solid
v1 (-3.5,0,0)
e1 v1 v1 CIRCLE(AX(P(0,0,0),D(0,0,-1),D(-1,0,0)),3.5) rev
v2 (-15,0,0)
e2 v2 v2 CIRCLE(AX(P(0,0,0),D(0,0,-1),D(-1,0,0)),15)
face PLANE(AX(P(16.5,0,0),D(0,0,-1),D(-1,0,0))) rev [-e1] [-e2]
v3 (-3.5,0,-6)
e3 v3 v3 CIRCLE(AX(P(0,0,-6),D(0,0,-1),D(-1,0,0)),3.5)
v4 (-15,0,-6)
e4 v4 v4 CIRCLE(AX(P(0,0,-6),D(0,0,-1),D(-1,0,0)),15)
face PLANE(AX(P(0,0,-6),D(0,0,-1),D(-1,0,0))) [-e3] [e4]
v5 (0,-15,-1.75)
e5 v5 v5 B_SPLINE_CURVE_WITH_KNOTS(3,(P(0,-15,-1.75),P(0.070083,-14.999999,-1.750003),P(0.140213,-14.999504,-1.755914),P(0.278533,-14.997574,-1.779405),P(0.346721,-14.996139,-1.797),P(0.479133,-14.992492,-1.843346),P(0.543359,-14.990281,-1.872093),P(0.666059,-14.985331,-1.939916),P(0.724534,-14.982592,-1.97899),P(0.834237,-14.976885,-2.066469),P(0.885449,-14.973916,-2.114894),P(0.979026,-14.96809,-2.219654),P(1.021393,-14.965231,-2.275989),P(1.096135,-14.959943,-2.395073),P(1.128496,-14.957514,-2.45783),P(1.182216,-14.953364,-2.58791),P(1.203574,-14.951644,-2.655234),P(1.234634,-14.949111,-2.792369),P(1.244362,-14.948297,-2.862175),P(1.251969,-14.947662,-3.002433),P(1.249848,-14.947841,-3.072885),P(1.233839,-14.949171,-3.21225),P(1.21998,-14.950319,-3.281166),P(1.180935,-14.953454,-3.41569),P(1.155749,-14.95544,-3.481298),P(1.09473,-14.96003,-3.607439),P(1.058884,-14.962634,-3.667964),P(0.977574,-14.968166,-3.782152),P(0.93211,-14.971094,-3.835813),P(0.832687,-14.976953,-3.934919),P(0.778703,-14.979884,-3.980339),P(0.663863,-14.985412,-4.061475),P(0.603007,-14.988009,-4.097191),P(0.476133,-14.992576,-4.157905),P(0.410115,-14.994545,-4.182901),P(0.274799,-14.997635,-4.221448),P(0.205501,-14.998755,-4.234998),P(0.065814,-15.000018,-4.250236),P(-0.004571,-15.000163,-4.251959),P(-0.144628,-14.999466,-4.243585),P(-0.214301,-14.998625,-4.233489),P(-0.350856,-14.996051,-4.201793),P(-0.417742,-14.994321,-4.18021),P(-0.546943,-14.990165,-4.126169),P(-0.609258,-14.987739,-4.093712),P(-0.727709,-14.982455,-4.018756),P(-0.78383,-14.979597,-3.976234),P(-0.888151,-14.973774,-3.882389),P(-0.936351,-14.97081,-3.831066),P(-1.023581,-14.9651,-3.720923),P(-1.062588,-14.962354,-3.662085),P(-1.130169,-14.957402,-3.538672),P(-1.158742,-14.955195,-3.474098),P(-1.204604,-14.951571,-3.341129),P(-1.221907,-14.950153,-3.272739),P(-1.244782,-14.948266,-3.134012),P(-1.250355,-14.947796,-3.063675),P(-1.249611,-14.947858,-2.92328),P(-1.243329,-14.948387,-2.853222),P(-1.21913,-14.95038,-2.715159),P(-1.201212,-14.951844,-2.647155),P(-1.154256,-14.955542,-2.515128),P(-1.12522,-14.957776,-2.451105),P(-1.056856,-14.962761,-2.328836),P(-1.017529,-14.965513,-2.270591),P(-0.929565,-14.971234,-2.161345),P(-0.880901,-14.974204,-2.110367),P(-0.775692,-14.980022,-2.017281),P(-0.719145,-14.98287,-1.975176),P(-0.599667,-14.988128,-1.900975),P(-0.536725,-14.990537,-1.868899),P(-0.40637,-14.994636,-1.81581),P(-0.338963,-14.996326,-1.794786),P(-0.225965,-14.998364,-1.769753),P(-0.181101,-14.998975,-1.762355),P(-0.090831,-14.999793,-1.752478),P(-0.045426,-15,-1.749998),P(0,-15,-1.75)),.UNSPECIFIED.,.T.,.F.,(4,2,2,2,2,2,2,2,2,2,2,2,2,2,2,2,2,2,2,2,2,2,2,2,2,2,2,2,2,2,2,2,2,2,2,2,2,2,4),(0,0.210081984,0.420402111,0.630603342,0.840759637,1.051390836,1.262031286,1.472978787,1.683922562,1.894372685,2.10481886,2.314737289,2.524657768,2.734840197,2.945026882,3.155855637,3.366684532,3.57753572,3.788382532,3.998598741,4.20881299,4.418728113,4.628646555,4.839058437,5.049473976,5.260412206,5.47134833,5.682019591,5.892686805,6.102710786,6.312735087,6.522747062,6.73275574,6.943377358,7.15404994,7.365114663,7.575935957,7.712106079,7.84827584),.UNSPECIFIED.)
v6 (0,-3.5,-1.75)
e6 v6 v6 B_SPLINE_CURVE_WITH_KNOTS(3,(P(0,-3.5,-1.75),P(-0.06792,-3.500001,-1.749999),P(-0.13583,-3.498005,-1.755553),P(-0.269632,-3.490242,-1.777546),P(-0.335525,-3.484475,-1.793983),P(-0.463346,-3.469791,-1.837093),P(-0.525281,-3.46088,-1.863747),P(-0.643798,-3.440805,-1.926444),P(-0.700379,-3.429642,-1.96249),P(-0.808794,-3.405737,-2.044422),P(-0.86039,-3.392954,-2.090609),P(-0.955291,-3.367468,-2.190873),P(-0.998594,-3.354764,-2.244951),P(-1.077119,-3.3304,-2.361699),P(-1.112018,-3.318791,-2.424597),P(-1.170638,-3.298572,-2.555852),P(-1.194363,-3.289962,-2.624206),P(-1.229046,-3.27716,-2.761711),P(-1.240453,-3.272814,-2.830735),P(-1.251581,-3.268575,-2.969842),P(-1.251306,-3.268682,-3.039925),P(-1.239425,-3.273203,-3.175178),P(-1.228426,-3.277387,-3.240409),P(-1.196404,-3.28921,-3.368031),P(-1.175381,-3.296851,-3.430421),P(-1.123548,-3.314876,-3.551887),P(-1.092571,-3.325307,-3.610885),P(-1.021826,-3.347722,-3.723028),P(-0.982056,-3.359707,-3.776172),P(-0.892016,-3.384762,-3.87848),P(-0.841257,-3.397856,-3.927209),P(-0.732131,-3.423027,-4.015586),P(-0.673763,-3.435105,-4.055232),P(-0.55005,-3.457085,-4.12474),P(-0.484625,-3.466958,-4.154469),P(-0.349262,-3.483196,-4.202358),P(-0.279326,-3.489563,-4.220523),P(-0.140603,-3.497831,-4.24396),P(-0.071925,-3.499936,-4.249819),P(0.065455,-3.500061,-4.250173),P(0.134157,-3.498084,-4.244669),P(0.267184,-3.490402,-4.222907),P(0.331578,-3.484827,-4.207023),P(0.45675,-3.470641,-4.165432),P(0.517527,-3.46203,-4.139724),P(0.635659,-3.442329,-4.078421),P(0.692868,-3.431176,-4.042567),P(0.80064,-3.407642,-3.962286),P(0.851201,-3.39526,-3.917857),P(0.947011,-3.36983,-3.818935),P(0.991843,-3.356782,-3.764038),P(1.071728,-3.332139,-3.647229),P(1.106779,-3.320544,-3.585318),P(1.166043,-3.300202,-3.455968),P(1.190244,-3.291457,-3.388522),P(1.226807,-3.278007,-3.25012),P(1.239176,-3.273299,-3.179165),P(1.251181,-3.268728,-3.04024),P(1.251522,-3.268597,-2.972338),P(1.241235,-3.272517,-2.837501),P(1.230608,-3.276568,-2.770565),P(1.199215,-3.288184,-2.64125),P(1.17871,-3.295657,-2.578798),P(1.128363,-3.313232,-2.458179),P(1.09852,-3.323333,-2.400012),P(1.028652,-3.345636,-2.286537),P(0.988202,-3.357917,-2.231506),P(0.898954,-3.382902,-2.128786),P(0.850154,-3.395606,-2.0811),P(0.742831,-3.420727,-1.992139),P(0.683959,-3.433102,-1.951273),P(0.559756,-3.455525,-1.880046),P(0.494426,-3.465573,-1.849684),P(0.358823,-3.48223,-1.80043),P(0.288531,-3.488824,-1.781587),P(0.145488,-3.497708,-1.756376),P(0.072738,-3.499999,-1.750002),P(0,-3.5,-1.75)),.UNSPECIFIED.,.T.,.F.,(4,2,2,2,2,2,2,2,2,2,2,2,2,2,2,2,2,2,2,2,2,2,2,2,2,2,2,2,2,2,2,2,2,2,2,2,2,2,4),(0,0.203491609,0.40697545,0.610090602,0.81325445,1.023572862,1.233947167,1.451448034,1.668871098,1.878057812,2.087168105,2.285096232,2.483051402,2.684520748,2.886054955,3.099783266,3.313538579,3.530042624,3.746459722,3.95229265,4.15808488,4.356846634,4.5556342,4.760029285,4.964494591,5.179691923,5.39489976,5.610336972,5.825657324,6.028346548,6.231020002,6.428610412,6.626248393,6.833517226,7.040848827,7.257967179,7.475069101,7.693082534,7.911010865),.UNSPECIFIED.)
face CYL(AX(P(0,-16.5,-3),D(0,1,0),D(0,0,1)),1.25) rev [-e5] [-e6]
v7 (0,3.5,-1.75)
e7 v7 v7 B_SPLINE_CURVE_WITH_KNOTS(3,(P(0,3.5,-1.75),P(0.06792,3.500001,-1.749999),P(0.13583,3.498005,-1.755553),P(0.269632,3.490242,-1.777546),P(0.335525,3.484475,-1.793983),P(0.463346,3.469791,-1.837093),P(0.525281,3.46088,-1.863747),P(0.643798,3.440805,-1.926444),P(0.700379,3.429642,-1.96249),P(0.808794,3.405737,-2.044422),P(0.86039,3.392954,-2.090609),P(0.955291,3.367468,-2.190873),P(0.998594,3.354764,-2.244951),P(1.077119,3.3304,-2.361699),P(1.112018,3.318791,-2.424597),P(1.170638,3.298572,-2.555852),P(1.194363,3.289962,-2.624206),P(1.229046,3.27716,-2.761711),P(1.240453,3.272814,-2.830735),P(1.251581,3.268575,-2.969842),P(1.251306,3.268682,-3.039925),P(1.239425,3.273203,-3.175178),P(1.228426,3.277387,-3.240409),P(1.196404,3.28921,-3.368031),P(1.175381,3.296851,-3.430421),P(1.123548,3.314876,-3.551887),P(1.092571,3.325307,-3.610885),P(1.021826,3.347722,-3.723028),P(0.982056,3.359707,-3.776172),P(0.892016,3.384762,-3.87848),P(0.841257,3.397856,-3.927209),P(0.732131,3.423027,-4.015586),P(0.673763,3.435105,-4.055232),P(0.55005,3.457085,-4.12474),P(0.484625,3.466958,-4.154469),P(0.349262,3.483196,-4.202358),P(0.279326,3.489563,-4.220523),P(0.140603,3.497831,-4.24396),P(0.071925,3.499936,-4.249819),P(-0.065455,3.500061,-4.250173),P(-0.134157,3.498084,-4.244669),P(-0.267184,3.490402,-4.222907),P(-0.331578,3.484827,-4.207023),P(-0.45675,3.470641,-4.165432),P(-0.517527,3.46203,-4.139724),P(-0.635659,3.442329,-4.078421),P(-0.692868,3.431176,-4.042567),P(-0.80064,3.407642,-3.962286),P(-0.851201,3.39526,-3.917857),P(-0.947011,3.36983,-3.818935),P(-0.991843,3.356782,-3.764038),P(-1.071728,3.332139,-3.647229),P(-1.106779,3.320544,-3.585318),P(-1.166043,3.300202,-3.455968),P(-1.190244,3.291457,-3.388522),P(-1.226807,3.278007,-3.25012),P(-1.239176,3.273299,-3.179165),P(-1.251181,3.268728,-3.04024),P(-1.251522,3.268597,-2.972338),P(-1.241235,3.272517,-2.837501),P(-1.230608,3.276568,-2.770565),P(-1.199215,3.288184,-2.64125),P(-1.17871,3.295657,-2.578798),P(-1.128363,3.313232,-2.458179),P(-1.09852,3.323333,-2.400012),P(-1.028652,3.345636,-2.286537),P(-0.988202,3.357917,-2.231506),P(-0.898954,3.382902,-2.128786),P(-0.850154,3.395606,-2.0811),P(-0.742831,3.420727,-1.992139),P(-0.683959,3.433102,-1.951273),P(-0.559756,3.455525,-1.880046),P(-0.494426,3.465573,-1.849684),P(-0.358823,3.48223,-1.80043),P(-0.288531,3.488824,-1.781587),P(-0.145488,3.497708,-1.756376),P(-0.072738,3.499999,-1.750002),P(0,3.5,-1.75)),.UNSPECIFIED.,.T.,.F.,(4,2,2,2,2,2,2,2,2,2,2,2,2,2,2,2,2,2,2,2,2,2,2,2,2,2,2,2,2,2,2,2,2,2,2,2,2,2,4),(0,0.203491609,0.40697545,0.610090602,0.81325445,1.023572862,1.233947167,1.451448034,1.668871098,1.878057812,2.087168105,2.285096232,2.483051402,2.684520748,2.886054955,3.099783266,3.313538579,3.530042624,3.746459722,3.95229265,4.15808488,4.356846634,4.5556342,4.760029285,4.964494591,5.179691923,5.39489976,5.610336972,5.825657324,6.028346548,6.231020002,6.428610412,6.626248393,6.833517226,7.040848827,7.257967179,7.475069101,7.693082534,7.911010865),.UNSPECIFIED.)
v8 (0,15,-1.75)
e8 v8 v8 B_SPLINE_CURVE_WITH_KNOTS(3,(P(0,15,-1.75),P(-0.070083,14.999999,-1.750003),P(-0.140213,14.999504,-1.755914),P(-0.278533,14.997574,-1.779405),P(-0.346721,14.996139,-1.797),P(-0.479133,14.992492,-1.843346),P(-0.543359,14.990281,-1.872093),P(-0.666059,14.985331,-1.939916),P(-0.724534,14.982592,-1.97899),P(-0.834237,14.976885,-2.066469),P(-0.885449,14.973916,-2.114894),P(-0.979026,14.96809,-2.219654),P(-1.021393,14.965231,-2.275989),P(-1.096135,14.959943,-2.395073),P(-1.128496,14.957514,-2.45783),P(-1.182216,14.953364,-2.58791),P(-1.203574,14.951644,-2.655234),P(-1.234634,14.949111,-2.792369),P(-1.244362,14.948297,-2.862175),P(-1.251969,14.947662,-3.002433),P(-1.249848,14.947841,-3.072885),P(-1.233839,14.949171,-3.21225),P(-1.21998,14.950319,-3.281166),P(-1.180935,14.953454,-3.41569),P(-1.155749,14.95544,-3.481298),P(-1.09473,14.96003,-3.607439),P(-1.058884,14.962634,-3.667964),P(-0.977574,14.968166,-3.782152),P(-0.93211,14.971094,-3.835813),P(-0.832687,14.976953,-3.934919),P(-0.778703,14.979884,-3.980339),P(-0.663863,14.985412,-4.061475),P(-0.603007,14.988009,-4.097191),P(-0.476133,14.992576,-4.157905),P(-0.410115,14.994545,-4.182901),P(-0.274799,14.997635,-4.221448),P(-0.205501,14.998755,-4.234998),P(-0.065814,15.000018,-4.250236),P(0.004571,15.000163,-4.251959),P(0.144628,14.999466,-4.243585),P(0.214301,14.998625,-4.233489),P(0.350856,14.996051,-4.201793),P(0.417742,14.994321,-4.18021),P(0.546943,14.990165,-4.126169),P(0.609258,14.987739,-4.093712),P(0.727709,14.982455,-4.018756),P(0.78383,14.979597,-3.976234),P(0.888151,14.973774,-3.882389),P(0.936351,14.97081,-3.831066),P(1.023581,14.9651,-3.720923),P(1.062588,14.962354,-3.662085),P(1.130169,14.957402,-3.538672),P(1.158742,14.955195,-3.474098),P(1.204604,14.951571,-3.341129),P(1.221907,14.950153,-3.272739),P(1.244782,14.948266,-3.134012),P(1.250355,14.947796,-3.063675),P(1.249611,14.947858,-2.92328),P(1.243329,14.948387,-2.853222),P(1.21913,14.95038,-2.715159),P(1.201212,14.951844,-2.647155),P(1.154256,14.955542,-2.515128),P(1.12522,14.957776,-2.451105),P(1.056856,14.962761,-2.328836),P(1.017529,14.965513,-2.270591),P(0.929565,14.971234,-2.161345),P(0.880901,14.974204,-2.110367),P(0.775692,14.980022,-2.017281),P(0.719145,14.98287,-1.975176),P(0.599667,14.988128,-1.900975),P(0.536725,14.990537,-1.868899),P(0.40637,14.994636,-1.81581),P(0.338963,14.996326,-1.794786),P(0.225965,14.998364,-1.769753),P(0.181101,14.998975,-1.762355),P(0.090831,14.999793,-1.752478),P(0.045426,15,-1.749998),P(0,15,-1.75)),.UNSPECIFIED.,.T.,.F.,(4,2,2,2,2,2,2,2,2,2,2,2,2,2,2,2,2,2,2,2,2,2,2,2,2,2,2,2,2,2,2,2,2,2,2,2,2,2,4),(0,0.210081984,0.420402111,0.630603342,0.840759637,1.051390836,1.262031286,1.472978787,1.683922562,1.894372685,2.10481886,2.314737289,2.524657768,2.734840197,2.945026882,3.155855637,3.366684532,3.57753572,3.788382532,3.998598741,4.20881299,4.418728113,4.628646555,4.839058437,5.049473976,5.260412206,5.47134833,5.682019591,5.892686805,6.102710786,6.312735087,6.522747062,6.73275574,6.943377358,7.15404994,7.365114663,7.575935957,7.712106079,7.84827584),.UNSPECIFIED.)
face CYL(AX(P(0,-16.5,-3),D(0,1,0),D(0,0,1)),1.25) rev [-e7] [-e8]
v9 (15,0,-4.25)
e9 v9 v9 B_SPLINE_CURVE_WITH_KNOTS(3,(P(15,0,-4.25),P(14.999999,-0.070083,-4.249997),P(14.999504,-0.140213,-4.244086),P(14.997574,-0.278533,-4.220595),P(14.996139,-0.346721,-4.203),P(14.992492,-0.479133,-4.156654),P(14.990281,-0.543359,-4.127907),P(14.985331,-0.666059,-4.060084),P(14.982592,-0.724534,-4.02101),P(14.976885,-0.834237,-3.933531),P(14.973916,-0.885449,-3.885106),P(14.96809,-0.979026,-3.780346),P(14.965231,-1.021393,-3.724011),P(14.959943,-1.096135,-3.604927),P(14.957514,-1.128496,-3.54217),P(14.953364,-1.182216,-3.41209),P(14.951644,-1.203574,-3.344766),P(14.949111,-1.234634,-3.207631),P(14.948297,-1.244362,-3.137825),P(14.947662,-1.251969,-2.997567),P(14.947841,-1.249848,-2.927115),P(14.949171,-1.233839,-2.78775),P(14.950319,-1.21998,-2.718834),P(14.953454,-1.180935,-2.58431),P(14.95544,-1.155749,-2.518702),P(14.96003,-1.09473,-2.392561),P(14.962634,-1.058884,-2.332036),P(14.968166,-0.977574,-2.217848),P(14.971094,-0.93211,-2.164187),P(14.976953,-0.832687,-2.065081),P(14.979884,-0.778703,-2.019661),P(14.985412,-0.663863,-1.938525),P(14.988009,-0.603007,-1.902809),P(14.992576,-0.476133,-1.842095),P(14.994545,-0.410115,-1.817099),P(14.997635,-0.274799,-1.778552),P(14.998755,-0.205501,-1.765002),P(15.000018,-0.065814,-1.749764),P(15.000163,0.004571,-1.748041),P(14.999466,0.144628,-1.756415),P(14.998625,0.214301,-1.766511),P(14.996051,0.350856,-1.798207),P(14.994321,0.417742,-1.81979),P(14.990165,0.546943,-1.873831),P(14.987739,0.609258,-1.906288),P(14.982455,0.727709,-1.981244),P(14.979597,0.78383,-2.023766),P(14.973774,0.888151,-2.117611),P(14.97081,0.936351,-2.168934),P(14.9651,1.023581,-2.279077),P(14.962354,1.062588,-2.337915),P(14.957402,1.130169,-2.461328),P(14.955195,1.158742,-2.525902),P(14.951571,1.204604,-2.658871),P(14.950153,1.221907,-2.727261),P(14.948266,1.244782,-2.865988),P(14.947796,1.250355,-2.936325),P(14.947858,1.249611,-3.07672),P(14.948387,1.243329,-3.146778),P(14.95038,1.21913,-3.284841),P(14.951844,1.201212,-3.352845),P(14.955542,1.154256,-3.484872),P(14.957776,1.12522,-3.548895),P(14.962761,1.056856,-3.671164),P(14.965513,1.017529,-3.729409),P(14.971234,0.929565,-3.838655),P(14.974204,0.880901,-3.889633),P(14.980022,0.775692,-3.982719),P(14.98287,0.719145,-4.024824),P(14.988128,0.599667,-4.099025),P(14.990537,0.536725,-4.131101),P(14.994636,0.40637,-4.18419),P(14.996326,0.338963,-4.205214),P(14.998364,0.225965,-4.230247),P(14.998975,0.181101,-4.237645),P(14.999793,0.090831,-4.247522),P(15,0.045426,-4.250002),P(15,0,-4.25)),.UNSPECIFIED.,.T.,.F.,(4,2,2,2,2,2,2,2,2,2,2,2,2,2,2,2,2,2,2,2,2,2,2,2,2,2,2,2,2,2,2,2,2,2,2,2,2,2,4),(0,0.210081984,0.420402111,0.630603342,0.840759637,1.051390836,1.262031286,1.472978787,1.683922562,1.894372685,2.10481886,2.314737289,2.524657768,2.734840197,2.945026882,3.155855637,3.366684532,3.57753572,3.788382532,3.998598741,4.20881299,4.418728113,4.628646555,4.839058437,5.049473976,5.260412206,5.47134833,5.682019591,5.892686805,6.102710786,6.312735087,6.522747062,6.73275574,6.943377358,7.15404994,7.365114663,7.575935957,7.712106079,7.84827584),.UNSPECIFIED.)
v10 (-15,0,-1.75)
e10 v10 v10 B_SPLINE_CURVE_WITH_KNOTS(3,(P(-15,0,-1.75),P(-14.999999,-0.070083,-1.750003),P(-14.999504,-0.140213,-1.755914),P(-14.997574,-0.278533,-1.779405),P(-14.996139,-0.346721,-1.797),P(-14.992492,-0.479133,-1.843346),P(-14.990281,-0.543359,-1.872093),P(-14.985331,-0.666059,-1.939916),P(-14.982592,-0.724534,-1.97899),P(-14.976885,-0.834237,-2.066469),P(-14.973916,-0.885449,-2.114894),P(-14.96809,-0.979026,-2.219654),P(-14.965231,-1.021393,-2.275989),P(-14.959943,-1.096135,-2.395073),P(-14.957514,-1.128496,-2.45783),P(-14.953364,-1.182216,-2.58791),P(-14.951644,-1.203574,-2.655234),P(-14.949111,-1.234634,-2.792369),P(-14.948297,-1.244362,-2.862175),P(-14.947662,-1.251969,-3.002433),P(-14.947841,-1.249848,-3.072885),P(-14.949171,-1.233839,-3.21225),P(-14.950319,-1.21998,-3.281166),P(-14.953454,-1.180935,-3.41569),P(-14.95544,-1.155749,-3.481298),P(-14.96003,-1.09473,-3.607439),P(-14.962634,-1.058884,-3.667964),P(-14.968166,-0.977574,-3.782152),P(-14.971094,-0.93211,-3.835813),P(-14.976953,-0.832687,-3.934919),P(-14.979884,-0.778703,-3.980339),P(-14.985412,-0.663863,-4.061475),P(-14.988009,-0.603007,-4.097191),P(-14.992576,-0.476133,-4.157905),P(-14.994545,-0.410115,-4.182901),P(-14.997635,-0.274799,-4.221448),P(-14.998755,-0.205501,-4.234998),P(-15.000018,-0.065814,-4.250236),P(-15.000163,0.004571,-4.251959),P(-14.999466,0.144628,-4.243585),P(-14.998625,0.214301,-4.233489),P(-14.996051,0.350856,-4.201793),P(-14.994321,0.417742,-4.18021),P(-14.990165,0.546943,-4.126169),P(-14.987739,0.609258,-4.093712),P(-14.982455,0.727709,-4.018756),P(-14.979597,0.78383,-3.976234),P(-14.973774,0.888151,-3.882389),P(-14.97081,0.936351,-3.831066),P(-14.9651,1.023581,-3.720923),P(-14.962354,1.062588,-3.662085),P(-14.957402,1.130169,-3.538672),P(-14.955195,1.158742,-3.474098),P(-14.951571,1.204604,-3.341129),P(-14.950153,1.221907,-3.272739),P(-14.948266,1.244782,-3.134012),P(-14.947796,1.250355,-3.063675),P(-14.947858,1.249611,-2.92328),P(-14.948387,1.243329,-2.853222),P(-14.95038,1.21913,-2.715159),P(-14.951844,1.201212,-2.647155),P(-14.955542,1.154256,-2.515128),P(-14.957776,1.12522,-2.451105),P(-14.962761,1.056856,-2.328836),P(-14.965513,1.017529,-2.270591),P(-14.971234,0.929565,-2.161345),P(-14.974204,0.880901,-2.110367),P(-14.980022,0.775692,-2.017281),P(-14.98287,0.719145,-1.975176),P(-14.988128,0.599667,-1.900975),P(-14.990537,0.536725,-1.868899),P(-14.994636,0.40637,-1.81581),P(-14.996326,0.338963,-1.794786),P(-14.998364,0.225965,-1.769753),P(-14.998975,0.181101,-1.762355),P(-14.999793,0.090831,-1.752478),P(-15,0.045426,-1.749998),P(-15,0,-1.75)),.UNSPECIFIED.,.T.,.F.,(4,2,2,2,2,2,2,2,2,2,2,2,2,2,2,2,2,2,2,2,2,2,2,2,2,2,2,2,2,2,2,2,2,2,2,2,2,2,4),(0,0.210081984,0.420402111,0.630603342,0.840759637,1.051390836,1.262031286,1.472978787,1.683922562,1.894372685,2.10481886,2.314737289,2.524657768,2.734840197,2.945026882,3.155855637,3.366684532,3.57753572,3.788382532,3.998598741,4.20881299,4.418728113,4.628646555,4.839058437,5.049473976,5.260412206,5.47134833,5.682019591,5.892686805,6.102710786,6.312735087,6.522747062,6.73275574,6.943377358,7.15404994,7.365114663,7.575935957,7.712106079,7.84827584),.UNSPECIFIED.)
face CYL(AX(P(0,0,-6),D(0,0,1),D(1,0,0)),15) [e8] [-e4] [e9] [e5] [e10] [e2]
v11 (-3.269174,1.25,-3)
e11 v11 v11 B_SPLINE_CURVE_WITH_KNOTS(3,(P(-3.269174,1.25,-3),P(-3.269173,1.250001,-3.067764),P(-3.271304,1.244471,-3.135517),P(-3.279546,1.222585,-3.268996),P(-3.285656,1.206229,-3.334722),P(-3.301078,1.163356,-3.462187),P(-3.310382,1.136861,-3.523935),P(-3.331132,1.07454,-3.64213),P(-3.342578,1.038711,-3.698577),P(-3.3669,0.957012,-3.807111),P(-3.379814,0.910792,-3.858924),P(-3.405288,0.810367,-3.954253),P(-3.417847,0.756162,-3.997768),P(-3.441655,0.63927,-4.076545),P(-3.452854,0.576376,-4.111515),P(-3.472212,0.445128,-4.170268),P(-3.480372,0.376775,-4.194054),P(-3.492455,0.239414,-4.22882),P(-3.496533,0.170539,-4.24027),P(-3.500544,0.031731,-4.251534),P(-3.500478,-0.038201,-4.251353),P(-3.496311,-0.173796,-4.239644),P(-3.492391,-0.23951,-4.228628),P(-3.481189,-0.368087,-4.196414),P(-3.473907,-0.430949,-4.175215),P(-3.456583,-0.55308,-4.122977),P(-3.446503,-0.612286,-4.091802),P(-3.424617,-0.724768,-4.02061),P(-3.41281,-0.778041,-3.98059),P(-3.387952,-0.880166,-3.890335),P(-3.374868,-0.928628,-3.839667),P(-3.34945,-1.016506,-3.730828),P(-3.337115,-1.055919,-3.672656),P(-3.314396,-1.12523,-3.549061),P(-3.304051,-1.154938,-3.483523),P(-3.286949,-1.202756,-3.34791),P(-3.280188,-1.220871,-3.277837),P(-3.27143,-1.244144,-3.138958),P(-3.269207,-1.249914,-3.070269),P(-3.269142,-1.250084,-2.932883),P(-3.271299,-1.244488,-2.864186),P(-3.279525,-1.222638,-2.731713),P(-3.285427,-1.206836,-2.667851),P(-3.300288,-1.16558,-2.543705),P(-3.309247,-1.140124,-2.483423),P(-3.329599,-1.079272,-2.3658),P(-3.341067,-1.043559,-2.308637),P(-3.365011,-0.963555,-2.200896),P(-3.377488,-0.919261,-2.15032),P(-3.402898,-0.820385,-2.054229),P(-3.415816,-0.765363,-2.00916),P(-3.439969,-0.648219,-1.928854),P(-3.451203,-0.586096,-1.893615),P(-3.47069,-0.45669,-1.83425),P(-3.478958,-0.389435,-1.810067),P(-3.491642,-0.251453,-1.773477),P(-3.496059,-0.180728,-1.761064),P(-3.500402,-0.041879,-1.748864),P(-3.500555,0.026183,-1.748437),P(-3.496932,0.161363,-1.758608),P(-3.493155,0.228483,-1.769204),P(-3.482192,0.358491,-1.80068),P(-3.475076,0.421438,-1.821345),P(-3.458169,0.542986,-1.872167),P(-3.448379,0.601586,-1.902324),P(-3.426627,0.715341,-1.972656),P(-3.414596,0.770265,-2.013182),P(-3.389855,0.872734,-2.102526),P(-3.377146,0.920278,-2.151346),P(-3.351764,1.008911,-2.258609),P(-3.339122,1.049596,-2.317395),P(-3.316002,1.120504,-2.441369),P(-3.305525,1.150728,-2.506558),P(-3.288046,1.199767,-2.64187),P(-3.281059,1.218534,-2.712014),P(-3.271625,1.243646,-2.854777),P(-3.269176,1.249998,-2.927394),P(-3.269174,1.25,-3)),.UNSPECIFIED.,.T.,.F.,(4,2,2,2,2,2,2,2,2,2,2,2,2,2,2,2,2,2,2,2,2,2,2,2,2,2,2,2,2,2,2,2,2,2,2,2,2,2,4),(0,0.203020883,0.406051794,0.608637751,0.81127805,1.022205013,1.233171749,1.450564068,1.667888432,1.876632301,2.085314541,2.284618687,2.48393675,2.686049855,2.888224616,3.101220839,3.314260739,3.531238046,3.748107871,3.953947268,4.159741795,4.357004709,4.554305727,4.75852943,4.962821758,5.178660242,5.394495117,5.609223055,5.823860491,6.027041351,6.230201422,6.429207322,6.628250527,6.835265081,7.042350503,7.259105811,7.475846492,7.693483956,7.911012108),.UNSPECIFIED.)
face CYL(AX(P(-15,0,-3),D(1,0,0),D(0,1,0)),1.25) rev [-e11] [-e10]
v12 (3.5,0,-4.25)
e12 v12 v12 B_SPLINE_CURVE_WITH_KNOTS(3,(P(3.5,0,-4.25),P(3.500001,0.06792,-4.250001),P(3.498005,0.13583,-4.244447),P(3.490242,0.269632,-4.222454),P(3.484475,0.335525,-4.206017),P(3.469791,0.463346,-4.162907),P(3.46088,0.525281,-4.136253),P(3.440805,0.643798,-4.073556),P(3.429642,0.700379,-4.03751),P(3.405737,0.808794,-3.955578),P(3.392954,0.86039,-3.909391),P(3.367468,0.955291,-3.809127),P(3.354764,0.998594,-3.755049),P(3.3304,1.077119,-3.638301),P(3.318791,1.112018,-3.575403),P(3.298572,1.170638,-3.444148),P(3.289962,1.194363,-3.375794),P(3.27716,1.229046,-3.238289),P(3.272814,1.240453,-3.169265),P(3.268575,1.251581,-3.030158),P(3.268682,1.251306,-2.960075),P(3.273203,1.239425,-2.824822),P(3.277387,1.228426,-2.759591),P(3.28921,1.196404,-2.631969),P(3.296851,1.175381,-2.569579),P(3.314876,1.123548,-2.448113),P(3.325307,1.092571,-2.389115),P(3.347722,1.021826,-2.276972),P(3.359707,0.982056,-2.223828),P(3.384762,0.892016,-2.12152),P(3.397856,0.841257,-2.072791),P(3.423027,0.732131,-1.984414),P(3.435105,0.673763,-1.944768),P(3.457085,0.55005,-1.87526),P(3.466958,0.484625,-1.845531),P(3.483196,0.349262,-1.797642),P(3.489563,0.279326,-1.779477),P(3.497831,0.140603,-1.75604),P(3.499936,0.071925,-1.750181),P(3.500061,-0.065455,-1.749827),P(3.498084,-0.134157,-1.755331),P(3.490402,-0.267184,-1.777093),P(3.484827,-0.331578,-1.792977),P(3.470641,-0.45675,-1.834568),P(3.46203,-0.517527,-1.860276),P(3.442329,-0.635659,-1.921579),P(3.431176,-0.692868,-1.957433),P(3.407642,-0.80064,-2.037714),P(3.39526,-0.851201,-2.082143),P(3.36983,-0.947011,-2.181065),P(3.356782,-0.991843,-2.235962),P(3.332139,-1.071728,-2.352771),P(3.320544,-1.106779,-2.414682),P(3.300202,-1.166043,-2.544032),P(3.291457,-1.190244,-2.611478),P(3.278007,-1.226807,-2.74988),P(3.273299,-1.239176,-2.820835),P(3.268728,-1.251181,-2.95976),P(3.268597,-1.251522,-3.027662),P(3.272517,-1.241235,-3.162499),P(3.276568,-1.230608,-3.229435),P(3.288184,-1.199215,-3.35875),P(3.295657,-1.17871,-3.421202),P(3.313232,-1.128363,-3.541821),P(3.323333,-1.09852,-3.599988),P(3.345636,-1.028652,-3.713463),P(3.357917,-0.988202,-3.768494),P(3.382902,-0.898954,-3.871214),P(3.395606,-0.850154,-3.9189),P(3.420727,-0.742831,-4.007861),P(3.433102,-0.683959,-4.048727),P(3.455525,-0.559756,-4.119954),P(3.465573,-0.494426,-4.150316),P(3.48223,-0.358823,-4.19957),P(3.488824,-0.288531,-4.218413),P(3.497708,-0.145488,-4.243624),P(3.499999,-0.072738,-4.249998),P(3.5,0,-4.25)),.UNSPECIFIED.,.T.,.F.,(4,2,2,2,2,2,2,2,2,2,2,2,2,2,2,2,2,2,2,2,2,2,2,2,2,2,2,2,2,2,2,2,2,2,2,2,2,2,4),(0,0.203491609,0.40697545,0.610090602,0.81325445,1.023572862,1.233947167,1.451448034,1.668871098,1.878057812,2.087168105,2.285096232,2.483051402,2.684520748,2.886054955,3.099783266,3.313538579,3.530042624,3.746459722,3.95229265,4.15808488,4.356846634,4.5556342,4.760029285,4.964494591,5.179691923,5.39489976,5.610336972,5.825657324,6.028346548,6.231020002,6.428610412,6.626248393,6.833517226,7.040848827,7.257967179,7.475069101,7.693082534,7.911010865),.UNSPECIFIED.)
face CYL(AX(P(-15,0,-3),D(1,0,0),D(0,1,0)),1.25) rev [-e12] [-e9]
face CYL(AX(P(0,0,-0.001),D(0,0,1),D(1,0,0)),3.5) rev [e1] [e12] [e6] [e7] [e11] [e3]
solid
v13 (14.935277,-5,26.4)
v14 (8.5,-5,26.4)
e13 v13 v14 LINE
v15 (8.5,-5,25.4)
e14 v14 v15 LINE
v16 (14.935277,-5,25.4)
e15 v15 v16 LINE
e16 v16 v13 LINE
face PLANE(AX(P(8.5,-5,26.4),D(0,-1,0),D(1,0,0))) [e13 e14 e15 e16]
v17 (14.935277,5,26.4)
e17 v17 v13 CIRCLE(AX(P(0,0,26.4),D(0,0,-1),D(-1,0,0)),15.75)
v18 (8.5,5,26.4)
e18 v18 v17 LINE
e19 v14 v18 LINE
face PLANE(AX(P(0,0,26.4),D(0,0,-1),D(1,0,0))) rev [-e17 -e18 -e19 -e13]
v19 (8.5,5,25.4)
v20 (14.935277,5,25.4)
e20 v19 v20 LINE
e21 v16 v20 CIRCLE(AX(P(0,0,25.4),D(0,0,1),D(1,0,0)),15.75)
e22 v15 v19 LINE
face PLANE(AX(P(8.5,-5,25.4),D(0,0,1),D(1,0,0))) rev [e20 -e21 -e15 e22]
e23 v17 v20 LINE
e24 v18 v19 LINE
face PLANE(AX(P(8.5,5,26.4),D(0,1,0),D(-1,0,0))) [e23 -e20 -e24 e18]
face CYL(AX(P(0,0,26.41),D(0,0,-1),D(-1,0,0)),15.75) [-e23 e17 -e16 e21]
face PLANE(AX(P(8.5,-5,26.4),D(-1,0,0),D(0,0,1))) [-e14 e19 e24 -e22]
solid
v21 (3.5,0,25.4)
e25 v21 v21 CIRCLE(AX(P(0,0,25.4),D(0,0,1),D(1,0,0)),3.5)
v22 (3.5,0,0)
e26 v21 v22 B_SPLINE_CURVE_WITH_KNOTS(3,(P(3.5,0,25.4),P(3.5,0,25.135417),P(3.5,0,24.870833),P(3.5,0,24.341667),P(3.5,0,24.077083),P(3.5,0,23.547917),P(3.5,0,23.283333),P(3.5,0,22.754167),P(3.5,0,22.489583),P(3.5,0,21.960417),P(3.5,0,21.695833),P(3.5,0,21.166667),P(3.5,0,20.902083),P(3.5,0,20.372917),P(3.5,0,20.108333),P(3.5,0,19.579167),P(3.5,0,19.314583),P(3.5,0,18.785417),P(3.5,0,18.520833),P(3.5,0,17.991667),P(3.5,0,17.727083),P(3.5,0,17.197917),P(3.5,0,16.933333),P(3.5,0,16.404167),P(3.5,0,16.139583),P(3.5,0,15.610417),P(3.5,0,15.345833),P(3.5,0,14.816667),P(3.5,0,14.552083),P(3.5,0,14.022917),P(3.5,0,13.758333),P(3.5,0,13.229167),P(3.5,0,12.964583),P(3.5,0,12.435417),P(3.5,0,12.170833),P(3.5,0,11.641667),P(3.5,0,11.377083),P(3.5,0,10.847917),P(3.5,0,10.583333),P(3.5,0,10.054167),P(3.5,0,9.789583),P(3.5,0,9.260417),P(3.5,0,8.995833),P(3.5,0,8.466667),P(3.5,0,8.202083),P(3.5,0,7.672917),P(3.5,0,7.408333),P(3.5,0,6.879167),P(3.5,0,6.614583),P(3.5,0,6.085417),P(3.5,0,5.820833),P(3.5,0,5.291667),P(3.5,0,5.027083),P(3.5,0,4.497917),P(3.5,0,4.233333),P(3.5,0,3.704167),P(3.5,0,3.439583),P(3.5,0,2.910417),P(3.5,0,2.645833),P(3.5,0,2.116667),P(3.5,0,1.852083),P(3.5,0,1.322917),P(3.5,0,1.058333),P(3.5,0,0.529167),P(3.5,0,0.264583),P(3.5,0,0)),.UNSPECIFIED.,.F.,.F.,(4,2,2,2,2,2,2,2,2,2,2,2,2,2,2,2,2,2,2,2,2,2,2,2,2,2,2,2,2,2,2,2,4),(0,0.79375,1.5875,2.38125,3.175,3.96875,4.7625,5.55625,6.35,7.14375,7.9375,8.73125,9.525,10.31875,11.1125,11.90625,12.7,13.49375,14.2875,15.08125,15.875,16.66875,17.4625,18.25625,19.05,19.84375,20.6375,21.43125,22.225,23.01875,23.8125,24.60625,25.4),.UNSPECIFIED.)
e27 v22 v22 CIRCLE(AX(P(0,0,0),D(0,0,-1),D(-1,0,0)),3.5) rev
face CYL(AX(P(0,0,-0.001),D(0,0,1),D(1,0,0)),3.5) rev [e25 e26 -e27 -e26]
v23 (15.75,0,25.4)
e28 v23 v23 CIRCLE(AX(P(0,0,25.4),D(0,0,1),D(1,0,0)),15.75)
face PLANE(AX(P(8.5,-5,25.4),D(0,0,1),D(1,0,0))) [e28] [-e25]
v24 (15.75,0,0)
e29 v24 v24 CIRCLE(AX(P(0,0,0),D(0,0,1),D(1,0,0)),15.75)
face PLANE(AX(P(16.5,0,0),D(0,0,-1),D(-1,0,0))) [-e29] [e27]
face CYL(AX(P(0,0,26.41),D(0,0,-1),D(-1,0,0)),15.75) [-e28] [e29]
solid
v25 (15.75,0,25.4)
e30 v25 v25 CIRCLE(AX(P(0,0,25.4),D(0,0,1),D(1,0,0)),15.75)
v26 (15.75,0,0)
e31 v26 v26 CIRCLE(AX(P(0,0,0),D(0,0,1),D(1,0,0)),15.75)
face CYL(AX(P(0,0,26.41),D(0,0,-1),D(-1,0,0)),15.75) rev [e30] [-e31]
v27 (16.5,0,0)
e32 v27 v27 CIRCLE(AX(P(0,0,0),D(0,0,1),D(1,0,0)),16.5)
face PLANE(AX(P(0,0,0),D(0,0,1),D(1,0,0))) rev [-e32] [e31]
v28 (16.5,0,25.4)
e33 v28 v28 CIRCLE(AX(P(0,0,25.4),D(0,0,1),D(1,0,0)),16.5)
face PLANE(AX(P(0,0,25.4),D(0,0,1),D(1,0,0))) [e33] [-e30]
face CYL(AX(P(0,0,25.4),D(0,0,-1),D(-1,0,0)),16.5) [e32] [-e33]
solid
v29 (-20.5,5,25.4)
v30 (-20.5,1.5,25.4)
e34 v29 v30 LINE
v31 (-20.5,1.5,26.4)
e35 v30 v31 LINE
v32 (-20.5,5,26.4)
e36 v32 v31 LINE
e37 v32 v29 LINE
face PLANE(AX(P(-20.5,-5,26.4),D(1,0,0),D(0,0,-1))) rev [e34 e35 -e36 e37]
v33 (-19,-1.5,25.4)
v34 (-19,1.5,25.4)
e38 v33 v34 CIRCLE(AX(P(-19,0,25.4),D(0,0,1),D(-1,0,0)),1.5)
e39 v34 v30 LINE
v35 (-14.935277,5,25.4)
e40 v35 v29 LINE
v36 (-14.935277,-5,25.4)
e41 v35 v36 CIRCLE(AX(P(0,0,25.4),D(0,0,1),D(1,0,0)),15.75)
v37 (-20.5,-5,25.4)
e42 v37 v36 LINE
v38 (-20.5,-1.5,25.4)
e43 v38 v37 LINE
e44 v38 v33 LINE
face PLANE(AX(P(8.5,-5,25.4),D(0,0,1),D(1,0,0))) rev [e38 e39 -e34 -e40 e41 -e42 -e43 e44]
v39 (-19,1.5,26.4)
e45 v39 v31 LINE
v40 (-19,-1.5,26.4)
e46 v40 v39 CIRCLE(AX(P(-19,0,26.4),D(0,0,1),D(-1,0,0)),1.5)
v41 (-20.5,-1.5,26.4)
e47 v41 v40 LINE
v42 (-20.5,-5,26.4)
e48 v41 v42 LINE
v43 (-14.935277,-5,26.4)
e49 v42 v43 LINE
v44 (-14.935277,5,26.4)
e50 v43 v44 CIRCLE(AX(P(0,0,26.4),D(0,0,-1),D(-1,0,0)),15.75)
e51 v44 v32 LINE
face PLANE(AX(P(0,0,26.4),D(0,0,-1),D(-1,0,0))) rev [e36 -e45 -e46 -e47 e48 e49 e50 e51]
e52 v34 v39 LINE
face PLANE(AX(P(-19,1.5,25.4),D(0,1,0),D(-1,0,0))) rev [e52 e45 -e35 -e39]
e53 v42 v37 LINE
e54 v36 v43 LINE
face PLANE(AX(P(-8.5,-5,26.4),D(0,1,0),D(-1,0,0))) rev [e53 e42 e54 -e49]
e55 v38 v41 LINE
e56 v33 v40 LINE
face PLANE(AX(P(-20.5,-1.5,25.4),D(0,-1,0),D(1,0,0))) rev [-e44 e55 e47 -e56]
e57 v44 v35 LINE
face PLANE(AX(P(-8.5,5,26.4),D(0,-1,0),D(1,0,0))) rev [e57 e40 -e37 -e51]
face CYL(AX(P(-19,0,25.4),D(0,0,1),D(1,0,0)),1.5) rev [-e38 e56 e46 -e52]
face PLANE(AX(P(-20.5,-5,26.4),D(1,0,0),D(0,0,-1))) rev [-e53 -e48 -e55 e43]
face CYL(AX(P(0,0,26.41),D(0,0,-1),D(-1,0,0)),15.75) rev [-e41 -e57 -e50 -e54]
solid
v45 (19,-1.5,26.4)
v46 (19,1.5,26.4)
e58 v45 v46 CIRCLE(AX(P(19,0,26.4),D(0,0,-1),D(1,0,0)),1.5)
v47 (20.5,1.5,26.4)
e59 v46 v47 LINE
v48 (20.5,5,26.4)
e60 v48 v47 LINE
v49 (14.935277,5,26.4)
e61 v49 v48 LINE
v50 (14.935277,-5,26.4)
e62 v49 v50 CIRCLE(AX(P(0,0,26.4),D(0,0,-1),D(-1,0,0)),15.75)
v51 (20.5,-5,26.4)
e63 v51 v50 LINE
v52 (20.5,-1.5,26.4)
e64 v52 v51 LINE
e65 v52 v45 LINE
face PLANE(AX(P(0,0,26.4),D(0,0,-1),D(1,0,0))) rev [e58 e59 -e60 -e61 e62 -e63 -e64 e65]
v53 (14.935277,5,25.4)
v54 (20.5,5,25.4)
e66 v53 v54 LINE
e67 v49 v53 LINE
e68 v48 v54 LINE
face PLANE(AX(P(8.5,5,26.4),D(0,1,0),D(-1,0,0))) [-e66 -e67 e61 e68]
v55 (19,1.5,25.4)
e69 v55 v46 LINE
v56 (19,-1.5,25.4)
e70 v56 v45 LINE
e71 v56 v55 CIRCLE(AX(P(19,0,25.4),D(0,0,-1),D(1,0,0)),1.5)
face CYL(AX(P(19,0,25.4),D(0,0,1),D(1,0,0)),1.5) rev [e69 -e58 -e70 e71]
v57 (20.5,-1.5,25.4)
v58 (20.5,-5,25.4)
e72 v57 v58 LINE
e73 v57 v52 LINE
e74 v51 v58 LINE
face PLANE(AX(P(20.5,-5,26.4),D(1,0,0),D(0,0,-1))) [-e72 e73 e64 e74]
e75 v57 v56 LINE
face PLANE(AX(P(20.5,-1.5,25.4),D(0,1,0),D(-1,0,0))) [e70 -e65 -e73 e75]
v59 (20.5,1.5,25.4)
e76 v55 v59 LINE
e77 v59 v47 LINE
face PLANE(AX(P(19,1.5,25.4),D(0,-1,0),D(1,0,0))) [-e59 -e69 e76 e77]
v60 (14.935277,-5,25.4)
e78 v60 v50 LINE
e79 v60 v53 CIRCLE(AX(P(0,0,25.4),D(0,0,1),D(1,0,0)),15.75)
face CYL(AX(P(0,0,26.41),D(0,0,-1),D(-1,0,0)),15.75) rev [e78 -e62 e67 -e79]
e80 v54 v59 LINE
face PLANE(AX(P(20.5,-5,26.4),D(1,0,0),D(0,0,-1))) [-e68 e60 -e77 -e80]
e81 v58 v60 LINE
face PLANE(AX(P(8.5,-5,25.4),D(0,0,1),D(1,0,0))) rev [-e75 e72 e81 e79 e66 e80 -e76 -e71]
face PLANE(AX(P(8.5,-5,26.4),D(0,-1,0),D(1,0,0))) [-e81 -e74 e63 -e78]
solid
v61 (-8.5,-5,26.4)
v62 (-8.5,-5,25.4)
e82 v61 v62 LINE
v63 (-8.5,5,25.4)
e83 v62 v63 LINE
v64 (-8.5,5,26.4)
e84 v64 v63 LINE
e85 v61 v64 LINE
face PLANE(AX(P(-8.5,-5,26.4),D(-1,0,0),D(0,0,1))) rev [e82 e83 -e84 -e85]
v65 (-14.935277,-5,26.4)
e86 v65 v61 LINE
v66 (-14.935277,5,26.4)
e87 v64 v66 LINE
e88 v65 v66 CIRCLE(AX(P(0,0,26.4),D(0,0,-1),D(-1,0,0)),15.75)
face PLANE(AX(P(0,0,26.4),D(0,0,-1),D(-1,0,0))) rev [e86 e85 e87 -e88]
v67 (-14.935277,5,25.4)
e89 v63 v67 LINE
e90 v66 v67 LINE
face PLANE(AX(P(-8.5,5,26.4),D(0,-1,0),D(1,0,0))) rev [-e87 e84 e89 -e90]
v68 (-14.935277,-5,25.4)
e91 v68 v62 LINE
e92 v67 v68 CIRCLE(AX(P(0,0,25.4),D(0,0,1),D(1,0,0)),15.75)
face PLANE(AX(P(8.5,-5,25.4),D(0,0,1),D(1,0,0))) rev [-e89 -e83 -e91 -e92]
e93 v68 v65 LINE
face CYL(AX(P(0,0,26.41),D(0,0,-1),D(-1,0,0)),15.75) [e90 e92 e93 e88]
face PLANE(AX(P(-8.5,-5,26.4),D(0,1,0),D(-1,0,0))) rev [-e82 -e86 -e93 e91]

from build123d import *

# Parameters (mm, degrees)
SKETCH_1_R                   = 16.5
EXTRUDE_1_DEPTH              = 25.4
CUT_EXTRUDE_1_REACH          = 36.491
SKETCH_2_R                   = 3.5
SKETCH_3_R                   = 15
SKETCH_3_R_2                 = 3.5
EXTRUDE_2_DEPTH              = 6
SKETCH_7_W                   = 12
SKETCH_7_H                   = 10
EXTRUDE_6_DEPTH              = 1
CUT_EXTRUDE_3_DEPTH          = 1
SPLIT_START                  = -6
SPLIT_BODIES_2_OUTLINE_R     = 15
SPLIT_BODIES_2_OUTLINE_R_2   = 3.5
SPLIT_BODIES_2_DEPTH         = 6
SPLIT_BODIES_2_2_OUTLINE_R   = 15.75
SPLIT_BODIES_2_2_OUTLINE_R_2 = 3.5
SPLIT_BODIES_2_2_DEPTH       = 25.4
SPLIT_BODIES_2_3_OUTLINE_R   = 16.5
SPLIT_BODIES_2_3_OUTLINE_R_2 = 3.5
SPLIT_BODIES_2_3_DEPTH       = 31.4
SPLIT_START_2                = 25.4
SPLIT_BODIES_2_4_DEPTH       = 1
SPLIT_BODIES_2_5_DEPTH       = 1
SPLIT_BODIES_2_6_DEPTH       = 1
SPLIT_BODIES_2_7_DEPTH       = 1
SPLIT_BODIES_2_8_OUTLINE_R   = 16.5
SPLIT_BODIES_2_8_OUTLINE_R_2 = 15.75
SPLIT_BODIES_2_8_DEPTH       = 25.4
SKETCH_11_R                  = 1.25
CUT_EXTRUDE_4_DEPTH          = 38.275461097
PATTERN_CIRCULAR_1_COUNT     = 2
PATTERN_CIRCULAR_1_ANGLE     = 90


# Read off the part's stored shape, not the designer's step: 分割2
with BuildPart() as part:
    # 草圖1 → 填料-伸長1 (new body)
    with BuildSketch(Plane.XY):
        Circle(SKETCH_1_R)
    extrude(amount=EXTRUDE_1_DEPTH)

    # 草圖2 → 除料-伸長1 (cut, up to next)
    with BuildSketch(Plane.XY.offset(25.4), mode=Mode.PRIVATE) as cut_extrude_1_sk1:
        Circle(SKETCH_2_R)
    cut_extrude_1_tool1 = extrude(cut_extrude_1_sk1.sketch, amount=-CUT_EXTRUDE_1_REACH, mode=Mode.PRIVATE) & part.part
    add(cut_extrude_1_tool1.solids().sort_by_distance((0, 0, 25.4))[0], mode=Mode.SUBTRACT)

    # 草圖3 → 填料-伸長2 (add)
    with BuildSketch(Plane(origin=(0, 0, 0), x_dir=(-1, 0, 0), z_dir=(0, 0, -1))):
        Circle(SKETCH_3_R)
        with Locations(Location((0, 0, 0), (0, 0, 180))):
            Circle(SKETCH_3_R_2, mode=Mode.SUBTRACT)
    extrude(amount=EXTRUDE_2_DEPTH)

    # 草圖7 → 填料-伸長6 (add)
    with BuildSketch(Plane.XY.offset(25.4)):
        with Locations((-14.5, 0)):
            Rectangle(SKETCH_7_W, SKETCH_7_H)
    extrude_6 = extrude(amount=EXTRUDE_6_DEPTH)

    # 草圖8 → 除料-伸長3 (cut)
    with BuildSketch(Plane.XY.offset(26.4)):
        with BuildLine():
            Line((-19, 1.5), (-20.5, 1.5))
            Line((-20.5, 1.5), (-20.5, -1.5))
            Line((-20.5, -1.5), (-19, -1.5))
            ThreePointArc((-19, -1.5), (-17.5, 0), (-19, 1.5))
        make_face()
    cut_extrude_3 = extrude(amount=-CUT_EXTRUDE_3_DEPTH, mode=Mode.SUBTRACT)

    # 鏡射2: 填料-伸長6, 除料-伸長3 across plane
    add(extrude_6.mirror(Plane(origin=(0, 0, 0), x_dir=(0, 0, 1), z_dir=(1, 0, 0))))
    add(cut_extrude_3.mirror(Plane(origin=(0, 0, 0), x_dir=(0, 0, 1), z_dir=(1, 0, 0))), mode=Mode.SUBTRACT)

    # Split Bodies 2 3 outline → Split Bodies 2 3 (cut)
    with BuildSketch(Plane.XY.offset(SPLIT_START)):
        Circle(SPLIT_BODIES_2_3_OUTLINE_R)
        Circle(SPLIT_BODIES_2_3_OUTLINE_R_2, mode=Mode.SUBTRACT)
    extrude(amount=SPLIT_BODIES_2_3_DEPTH, mode=Mode.SUBTRACT)

    # Split Bodies 2 4 outline → Split Bodies 2 4 (cut)
    with BuildSketch(Plane.XY.offset(SPLIT_START_2)):
        with BuildLine():
            ThreePointArc((-14.935277031, -5), (-15.75, 0), (-14.935277031, 5))
            Line((-14.935277031, 5), (-20.5, 5))
            Line((-20.5, 5), (-20.5, 1.5))
            Line((-20.5, 1.5), (-19, 1.5))
            ThreePointArc((-19, 1.5), (-17.5, 0), (-19, -1.5))
            Line((-19, -1.5), (-20.5, -1.5))
            Line((-20.5, -1.5), (-20.5, -5))
            Line((-20.5, -5), (-14.935277031, -5))
        make_face()
        with BuildLine():
            Line((8.5, -5), (20.5, -5))
            Line((20.5, -5), (20.5, -1.5))
            Line((20.5, -1.5), (19, -1.5))
            ThreePointArc((19, -1.5), (17.5, 0), (19, 1.5))
            Line((19, 1.5), (20.5, 1.5))
            Line((20.5, 1.5), (20.5, 5))
            Line((20.5, 5), (8.5, 5))
            Line((8.5, 5), (8.5, -5))
        make_face()
    extrude(amount=SPLIT_BODIES_2_4_DEPTH, mode=Mode.SUBTRACT)


with BuildPart() as body_2:
    # Split Bodies 2 outline → Split Bodies 2 (new body)
    with BuildSketch(Plane.XY.offset(SPLIT_START)):
        Circle(SPLIT_BODIES_2_OUTLINE_R)
        Circle(SPLIT_BODIES_2_OUTLINE_R_2, mode=Mode.SUBTRACT)
    extrude(amount=SPLIT_BODIES_2_DEPTH)

    # 草圖11 → 除料-伸長4 (cut, symmetric)
    with BuildSketch(Plane(origin=(0, 0, 0), x_dir=(1, 0, 0), z_dir=(0, 1, 0))):
        with Locations(Location((0, 3, 0), (0, 0, 270))):
            Circle(SKETCH_11_R)
    cut_extrude_4 = extrude(amount=CUT_EXTRUDE_4_DEPTH, both=True, mode=Mode.SUBTRACT)

    # 環狀複製排列1: 除料-伸長4 ×2 about axis
    pattern_circular_1_axis = Axis((0, 0, -6), (0, 0, -1))
    for i in range(1, PATTERN_CIRCULAR_1_COUNT):
        add(cut_extrude_4.rotate(pattern_circular_1_axis, i * PATTERN_CIRCULAR_1_ANGLE / (PATTERN_CIRCULAR_1_COUNT - 1)), mode=Mode.SUBTRACT)


with BuildPart() as body_3:
    # Split Bodies 2 2 outline → Split Bodies 2 2 (new body)
    with BuildSketch(Plane.XY):
        Circle(SPLIT_BODIES_2_2_OUTLINE_R)
        Circle(SPLIT_BODIES_2_2_OUTLINE_R_2, mode=Mode.SUBTRACT)
    extrude(amount=SPLIT_BODIES_2_2_DEPTH)


with BuildPart() as body_4:
    # Split Bodies 2 5 outline → Split Bodies 2 5 (new body)
    with BuildSketch(Plane.XY.offset(SPLIT_START_2)):
        with BuildLine():
            Line((-20.5, -5), (-14.935277031, -5))
            ThreePointArc((-14.935277031, -5), (-15.75, 0), (-14.935277031, 5))
            Line((-14.935277031, 5), (-20.5, 5))
            Line((-20.5, 5), (-20.5, 1.5))
            Line((-20.5, 1.5), (-19, 1.5))
            ThreePointArc((-19, 1.5), (-17.5, 0), (-19, -1.5))
            Line((-19, -1.5), (-20.5, -1.5))
            Line((-20.5, -1.5), (-20.5, -5))
        make_face()
    extrude(amount=SPLIT_BODIES_2_5_DEPTH)


with BuildPart() as body_5:
    # Split Bodies 2 6 outline → Split Bodies 2 6 (new body)
    with BuildSketch(Plane.XY.offset(SPLIT_START_2)):
        with BuildLine():
            Line((20.5, 5), (14.935277031, 5))
            ThreePointArc((14.935277031, 5), (15.75, 0), (14.935277031, -5))
            Line((14.935277031, -5), (20.5, -5))
            Line((20.5, -5), (20.5, -1.5))
            Line((20.5, -1.5), (19, -1.5))
            ThreePointArc((19, -1.5), (17.5, 0), (19, 1.5))
            Line((19, 1.5), (20.5, 1.5))
            Line((20.5, 1.5), (20.5, 5))
        make_face()
    extrude(amount=SPLIT_BODIES_2_6_DEPTH)


with BuildPart() as body_6:
    # Split Bodies 2 7 outline → Split Bodies 2 7 (new body)
    with BuildSketch(Plane.XY.offset(SPLIT_START_2)):
        with BuildLine():
            ThreePointArc((14.935277031, -5), (15.75, 0), (14.935277031, 5))
            Line((14.935277031, 5), (8.5, 5))
            Line((8.5, 5), (8.5, -5))
            Line((8.5, -5), (14.935277031, -5))
        make_face()
    extrude(amount=SPLIT_BODIES_2_7_DEPTH)


with BuildPart() as body_7:
    # Split Bodies 2 8 outline → Split Bodies 2 8 (new body)
    with BuildSketch(Plane.XY):
        Circle(SPLIT_BODIES_2_8_OUTLINE_R)
        Circle(SPLIT_BODIES_2_8_OUTLINE_R_2, mode=Mode.SUBTRACT)
    extrude(amount=SPLIT_BODIES_2_8_DEPTH)


solid = Compound([part.part, body_2.part, body_3.part, body_4.part, body_5.part, body_6.part, body_7.part])
